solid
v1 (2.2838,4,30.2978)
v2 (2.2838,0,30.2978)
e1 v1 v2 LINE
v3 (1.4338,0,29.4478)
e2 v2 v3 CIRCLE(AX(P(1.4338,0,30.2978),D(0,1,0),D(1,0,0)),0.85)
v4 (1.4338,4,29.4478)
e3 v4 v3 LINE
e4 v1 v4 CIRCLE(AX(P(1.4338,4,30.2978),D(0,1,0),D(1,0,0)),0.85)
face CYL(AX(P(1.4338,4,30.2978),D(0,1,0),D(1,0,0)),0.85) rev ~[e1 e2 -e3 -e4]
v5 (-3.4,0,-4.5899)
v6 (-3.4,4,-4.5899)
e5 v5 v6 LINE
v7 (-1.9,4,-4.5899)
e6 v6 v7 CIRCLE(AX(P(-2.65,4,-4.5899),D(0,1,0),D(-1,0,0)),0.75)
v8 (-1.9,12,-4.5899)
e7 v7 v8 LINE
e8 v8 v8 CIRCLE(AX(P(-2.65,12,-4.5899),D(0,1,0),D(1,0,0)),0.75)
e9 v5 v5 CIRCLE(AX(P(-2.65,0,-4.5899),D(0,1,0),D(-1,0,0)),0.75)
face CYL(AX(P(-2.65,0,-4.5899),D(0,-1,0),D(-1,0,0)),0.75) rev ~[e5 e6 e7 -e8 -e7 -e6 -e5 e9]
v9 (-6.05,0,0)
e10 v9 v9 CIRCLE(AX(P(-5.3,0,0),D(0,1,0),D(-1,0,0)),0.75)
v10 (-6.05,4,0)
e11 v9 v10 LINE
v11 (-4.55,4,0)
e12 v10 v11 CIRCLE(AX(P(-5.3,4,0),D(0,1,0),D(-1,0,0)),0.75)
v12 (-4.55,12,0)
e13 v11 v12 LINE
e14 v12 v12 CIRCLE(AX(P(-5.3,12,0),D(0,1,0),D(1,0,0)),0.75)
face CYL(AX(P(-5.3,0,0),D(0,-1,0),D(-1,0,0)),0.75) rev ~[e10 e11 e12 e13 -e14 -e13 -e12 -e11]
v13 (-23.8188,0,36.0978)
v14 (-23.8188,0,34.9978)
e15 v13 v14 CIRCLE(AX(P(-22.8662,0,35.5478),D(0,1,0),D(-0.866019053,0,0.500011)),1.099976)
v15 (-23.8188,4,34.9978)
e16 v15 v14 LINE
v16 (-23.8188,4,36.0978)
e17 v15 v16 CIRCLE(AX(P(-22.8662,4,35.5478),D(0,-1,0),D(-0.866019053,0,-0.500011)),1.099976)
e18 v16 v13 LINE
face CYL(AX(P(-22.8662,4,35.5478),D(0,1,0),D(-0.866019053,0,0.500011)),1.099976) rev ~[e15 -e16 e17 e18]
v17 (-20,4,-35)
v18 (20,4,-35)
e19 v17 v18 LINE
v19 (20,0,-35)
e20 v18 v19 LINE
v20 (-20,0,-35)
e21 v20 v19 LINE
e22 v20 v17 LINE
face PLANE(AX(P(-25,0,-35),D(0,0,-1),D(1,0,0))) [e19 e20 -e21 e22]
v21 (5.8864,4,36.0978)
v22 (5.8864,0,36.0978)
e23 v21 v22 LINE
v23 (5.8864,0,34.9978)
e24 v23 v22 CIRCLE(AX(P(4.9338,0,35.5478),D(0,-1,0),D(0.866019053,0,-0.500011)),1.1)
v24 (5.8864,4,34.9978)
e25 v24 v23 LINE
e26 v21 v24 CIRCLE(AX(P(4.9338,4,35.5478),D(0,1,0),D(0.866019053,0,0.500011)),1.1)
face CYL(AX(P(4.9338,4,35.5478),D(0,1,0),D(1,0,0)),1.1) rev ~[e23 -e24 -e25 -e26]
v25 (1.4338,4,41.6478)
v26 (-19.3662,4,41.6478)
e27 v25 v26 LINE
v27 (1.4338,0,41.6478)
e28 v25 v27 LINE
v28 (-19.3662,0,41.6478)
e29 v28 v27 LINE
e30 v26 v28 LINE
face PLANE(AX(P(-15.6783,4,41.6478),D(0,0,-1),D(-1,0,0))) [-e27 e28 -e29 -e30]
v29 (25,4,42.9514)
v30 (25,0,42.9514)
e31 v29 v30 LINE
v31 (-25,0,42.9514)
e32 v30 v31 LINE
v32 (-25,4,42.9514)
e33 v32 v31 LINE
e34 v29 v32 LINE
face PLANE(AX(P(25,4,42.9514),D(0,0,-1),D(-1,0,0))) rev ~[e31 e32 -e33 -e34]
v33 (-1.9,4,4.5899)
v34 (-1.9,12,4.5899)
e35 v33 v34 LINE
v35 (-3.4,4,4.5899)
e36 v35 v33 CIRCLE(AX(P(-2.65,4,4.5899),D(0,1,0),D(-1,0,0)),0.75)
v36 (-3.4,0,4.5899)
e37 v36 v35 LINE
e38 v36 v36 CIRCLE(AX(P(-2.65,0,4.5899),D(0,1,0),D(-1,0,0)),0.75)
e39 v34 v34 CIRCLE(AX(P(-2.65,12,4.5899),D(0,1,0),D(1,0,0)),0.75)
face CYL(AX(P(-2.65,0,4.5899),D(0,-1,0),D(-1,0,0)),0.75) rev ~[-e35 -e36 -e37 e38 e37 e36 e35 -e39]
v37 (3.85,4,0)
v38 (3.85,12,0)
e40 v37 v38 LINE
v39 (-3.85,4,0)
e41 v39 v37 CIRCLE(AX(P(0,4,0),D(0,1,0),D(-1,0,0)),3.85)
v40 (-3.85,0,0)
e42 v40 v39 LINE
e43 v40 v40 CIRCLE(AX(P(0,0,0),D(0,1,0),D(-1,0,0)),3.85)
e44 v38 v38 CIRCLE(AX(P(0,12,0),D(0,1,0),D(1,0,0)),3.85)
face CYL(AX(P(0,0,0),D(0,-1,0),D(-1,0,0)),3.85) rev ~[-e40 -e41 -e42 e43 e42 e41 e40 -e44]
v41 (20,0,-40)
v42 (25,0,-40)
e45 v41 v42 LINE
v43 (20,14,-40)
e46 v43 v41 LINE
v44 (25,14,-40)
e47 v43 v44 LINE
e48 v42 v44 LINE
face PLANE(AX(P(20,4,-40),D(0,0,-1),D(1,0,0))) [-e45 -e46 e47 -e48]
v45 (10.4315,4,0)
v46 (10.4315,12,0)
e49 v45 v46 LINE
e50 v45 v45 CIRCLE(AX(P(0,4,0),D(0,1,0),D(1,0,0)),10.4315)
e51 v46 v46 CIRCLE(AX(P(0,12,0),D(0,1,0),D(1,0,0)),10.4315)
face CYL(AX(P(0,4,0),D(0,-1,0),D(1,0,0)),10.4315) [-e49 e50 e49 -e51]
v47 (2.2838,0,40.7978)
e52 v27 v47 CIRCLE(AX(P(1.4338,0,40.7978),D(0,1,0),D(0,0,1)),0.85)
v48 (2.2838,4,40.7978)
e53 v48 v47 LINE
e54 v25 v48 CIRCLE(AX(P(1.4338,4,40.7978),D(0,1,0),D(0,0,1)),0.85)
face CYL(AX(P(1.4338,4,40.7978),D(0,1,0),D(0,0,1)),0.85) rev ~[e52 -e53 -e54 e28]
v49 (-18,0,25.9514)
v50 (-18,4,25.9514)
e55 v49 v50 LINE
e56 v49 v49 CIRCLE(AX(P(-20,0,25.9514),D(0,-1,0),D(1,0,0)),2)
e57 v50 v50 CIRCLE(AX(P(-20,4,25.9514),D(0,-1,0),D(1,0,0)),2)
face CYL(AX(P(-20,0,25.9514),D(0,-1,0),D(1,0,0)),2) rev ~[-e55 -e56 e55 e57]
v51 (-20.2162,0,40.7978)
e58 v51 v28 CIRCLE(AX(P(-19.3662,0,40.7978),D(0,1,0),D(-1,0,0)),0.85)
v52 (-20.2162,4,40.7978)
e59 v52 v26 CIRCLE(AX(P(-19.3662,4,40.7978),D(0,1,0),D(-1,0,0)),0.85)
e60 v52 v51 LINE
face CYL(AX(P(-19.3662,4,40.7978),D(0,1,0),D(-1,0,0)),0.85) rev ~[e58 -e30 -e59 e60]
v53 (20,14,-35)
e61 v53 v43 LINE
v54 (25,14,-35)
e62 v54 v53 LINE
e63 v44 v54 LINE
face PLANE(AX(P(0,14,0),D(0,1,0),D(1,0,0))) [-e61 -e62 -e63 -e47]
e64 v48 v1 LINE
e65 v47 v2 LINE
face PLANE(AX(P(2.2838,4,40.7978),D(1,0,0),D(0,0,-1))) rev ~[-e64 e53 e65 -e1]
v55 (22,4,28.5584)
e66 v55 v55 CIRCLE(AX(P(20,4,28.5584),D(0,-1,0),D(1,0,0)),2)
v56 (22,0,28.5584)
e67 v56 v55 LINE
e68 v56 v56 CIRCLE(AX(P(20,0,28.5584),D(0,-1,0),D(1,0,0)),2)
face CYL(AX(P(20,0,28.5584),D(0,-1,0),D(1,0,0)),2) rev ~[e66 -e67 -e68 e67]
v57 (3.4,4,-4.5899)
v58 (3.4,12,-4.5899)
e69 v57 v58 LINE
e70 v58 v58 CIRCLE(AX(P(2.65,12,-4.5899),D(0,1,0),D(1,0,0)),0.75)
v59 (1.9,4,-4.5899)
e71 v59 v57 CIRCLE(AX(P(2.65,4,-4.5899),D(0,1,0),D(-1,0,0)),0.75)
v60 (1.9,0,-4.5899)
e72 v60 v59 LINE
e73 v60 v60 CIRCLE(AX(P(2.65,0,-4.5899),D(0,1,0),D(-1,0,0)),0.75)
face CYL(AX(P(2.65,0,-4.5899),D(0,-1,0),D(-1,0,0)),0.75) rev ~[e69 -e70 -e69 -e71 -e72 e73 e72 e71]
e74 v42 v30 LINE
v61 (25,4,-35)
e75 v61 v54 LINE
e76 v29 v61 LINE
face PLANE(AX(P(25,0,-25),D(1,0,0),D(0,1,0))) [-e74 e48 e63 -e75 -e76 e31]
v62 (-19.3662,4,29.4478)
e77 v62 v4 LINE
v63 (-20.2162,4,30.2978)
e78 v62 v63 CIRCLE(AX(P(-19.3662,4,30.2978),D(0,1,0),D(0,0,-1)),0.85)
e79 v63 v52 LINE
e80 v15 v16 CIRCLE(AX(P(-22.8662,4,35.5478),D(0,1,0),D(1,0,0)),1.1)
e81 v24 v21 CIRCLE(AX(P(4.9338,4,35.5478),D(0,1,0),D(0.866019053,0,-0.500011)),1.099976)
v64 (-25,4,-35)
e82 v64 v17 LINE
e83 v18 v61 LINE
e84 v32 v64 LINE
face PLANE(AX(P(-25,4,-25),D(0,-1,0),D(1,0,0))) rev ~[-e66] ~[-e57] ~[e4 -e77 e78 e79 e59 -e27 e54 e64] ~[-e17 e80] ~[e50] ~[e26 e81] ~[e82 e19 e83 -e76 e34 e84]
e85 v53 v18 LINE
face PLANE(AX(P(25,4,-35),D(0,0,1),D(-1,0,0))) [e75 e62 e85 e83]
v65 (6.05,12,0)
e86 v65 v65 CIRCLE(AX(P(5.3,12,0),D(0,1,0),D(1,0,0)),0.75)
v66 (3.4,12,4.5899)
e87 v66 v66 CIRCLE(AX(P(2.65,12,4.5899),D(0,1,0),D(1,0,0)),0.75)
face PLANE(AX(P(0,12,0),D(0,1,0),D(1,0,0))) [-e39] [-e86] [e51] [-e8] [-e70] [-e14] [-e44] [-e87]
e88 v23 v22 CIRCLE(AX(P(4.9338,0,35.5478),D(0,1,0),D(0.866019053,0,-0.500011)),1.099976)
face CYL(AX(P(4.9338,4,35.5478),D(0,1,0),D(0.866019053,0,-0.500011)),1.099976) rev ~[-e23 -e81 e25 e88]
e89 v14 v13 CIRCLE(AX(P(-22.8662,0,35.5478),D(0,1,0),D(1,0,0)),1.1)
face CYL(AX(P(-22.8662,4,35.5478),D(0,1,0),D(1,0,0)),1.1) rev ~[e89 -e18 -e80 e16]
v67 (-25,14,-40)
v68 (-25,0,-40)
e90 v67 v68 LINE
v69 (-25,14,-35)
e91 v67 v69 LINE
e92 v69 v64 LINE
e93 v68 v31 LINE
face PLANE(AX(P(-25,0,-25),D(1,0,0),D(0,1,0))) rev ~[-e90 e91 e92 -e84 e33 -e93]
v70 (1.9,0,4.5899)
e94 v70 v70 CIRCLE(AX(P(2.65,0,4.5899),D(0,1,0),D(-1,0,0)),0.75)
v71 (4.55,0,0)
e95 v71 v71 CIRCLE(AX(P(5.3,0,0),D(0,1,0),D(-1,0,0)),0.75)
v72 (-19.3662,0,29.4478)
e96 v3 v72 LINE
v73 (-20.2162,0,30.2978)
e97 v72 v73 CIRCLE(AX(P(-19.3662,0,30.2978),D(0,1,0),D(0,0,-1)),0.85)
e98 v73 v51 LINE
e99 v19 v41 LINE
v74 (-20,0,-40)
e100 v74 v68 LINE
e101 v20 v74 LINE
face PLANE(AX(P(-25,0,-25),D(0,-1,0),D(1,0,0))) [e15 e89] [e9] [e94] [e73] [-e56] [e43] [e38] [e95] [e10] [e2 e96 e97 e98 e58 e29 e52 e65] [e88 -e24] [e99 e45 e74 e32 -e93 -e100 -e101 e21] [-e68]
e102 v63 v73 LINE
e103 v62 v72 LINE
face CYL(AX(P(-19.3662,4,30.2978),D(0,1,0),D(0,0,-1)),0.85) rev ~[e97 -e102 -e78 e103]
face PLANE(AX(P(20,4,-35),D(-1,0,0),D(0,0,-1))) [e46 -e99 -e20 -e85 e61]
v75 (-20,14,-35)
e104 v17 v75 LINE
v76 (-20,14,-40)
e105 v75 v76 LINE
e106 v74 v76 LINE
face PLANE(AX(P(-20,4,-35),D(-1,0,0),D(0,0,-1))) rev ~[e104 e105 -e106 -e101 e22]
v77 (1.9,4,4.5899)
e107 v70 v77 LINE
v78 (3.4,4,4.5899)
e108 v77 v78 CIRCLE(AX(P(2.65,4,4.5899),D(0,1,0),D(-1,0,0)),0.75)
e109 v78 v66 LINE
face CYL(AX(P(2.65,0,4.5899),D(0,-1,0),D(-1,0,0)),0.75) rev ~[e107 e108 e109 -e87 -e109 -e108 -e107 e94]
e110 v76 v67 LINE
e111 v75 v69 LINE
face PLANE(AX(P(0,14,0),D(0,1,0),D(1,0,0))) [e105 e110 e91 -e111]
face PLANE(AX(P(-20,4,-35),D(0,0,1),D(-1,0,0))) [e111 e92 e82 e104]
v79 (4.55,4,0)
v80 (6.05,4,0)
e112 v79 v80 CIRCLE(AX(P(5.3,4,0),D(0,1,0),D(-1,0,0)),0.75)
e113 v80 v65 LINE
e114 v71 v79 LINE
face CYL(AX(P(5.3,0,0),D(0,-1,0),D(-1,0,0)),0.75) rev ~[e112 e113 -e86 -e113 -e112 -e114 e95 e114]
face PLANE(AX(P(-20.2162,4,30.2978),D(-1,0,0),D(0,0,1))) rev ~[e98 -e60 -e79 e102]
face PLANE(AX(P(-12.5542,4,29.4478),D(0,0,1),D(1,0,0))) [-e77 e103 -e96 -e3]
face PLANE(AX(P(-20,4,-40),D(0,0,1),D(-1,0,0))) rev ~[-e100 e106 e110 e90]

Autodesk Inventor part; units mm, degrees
ref_plane "YZ Plane" through (0, 0, 0) normal (1, 0, 0) x (0, 1, 0)
ref_plane "XZ Plane" through (0, 0, 0) normal (0, 1, 0) x (-1, 0, 0)
ref_plane "XY Plane" through (0, 0, 0) normal (0, 0, 1) x (1, 0, 0)
sketch "Эскиз1" plane through (0, 0, 0) normal (0, 1, 0) x (-1, 0, 0)
  circle A0 centre (-2.65, -4.5899) radius 0.75
  circle A1 centre (2.65, -4.5899) radius 0.75
  circle A2 centre (5.3, 0) radius 0.75
  circle A3 centre (2.65, 4.5899) radius 0.75
  circle A4 centre (-2.65, 4.5899) radius 0.75
  circle A5 centre (-5.3, 0) radius 0.75
  circle A6 centre (0, 0) radius 3.85
  arc A7 (-3.4059, 8.2225) -> (-3.1756, 6.1003) centre (3.6513, 7.9146) ccw
  arc A8 (-3.1756, 6.1003) -> (-3.6952, 5.8003) centre (0, 0) ccw
  arc A9 (-3.6952, 5.8003) -> (-5.418, 7.0608) centre (-8.6799, 0.7952) ccw
  arc A10 (-5.418, 7.0608) -> (-6.0128, 6.5618) centre (0, 0) ccw
  arc A11 (-6.0128, 6.5618) -> (-5.0705, 4.6463) centre (0.7241, 8.6861) ccw
  arc A12 (-5.0705, 4.6463) -> (-5.4562, 4.1867) centre (0, 0) ccw
  arc A13 (-5.4562, 4.1867) -> (-7.5062, 4.782) centre (-8.4284, -2.2214) ccw
  arc A14 (-7.5062, 4.782) -> (-7.8944, 4.1096) centre (0, 0) ccw
  arc A15 (-7.8944, 4.1096) -> (-6.3539, 2.6319) centre (-2.2904, 8.4099) ccw
  arc A16 (-6.3539, 2.6319) -> (-6.5591, 2.0681) centre (0, 0) ccw
  arc A17 (-6.5591, 2.0681) -> (-8.689, 1.9263) centre (-7.1604, -4.9702) ccw
  arc A18 (-8.689, 1.9263) -> (-8.8239, 1.1617) centre (0, 0) ccw
  arc A19 (-8.8239, 1.1617) -> (-6.8708, 0.3) centre (-5.0286, 7.1194) ccw
  arc A20 (-6.8708, 0.3) -> (-6.8708, -0.3) centre (0, 0) ccw
  arc A21 (-6.8708, -0.3) -> (-8.8239, -1.1617) centre (-5.0286, -7.1194) ccw
  arc A22 (-8.8239, -1.1617) -> (-8.689, -1.9263) centre (0, 0) ccw
  arc A23 (-8.689, -1.9263) -> (-6.5591, -2.0681) centre (-7.1604, 4.9702) ccw
  arc A24 (-6.5591, -2.0681) -> (-6.3539, -2.6319) centre (0, 0) ccw
  arc A25 (-6.3539, -2.6319) -> (-7.8944, -4.1096) centre (-2.2904, -8.4099) ccw
  arc A26 (-7.8944, -4.1096) -> (-7.5062, -4.782) centre (0, 0) ccw
  arc A27 (-7.5062, -4.782) -> (-5.4562, -4.1867) centre (-8.4284, 2.2214) ccw
  arc A28 (-5.4562, -4.1867) -> (-5.0705, -4.6463) centre (0, 0) ccw
  arc A29 (-5.0705, -4.6463) -> (-6.0128, -6.5618) centre (0.7241, -8.6861) ccw
  arc A30 (-6.0128, -6.5618) -> (-5.418, -7.0608) centre (0, 0) ccw
  arc A31 (-5.418, -7.0608) -> (-3.6952, -5.8003) centre (-8.6799, -0.7952) ccw
  arc A32 (-3.6952, -5.8003) -> (-3.1756, -6.1003) centre (0, 0) ccw
  arc A33 (-3.1756, -6.1003) -> (-3.4059, -8.2225) centre (3.6513, -7.9146) ccw
  arc A34 (-3.4059, -8.2225) -> (-2.6763, -8.4881) centre (0, 0) ccw
  arc A35 (-2.6763, -8.4881) -> (-1.4885, -6.7144) centre (-7.8845, -3.716) ccw
  arc A36 (-1.4885, -6.7144) -> (-0.8977, -6.8185) centre (0, 0) ccw
  arc A37 (-0.8977, -6.8185) -> (-0.3882, -8.8915) centre (6.138, -6.1885) ccw
  arc A38 (-0.3882, -8.8915) -> (0.3882, -8.8915) centre (0, 0) ccw
  arc A39 (0.3882, -8.8915) -> (0.8977, -6.8185) centre (-6.138, -6.1885) ccw
  arc A40 (0.8977, -6.8185) -> (1.4885, -6.7144) centre (0, 0) ccw
  arc A41 (1.4885, -6.7144) -> (2.6763, -8.4881) centre (7.8845, -3.716) ccw
  arc A42 (2.6763, -8.4881) -> (3.4059, -8.2225) centre (0, 0) ccw
  arc A43 (3.4059, -8.2225) -> (3.1756, -6.1003) centre (-3.6513, -7.9146) ccw
  arc A44 (3.1756, -6.1003) -> (3.6952, -5.8003) centre (0, 0) ccw
  arc A45 (3.6952, -5.8003) -> (5.418, -7.0608) centre (8.6799, -0.7952) ccw
  arc A46 (5.418, -7.0608) -> (6.0128, -6.5618) centre (0, 0) ccw
  arc A47 (6.0128, -6.5618) -> (5.0705, -4.6463) centre (-0.7241, -8.6861) ccw
  arc A48 (5.0705, -4.6463) -> (5.4562, -4.1867) centre (0, 0) ccw
  arc A49 (5.4562, -4.1867) -> (7.5062, -4.782) centre (8.4284, 2.2214) ccw
  arc A50 (7.5062, -4.782) -> (7.8944, -4.1096) centre (0, 0) ccw
  arc A51 (7.8944, -4.1096) -> (6.3539, -2.6319) centre (2.2904, -8.4099) ccw
  arc A52 (6.3539, -2.6319) -> (6.5591, -2.0681) centre (0, 0) ccw
  arc A53 (6.5591, -2.0681) -> (8.689, -1.9263) centre (7.1604, 4.9702) ccw
  arc A54 (8.689, -1.9263) -> (8.8239, -1.1617) centre (0, 0) ccw
  arc A55 (8.8239, -1.1617) -> (6.8708, -0.3) centre (5.0286, -7.1194) ccw
  arc A56 (6.8708, -0.3) -> (6.8708, 0.3) centre (0, 0) ccw
  arc A57 (6.8708, 0.3) -> (8.8239, 1.1617) centre (5.0286, 7.1194) ccw
  arc A58 (8.8239, 1.1617) -> (8.689, 1.9263) centre (0, 0) ccw
  arc A59 (8.689, 1.9263) -> (6.5591, 2.0681) centre (7.1604, -4.9702) ccw
  arc A60 (6.5591, 2.0681) -> (6.3539, 2.6319) centre (0, 0) ccw
  arc A61 (6.3539, 2.6319) -> (7.8944, 4.1096) centre (2.2904, 8.4099) ccw
  arc A62 (7.8944, 4.1096) -> (7.5062, 4.782) centre (0, 0) ccw
  arc A63 (7.5062, 4.782) -> (5.4562, 4.1867) centre (8.4284, -2.2214) ccw
  arc A64 (5.4562, 4.1867) -> (5.0705, 4.6463) centre (0, 0) ccw
  arc A65 (5.0705, 4.6463) -> (6.0128, 6.5618) centre (-0.7241, 8.6861) ccw
  arc A66 (6.0128, 6.5618) -> (5.418, 7.0608) centre (0, 0) ccw
  arc A67 (5.418, 7.0608) -> (3.6952, 5.8003) centre (8.6799, 0.7952) ccw
  arc A68 (3.6952, 5.8003) -> (3.1756, 6.1003) centre (0, 0) ccw
  arc A69 (3.1756, 6.1003) -> (3.4059, 8.2225) centre (-3.6513, 7.9146) ccw
  arc A70 (3.4059, 8.2225) -> (2.6763, 8.4881) centre (0, 0) ccw
  arc A71 (2.6763, 8.4881) -> (1.4885, 6.7144) centre (7.8845, 3.716) ccw
  arc A72 (1.4885, 6.7144) -> (0.8977, 6.8185) centre (0, 0) ccw
  arc A73 (0.8977, 6.8185) -> (0.3882, 8.8915) centre (-6.138, 6.1885) ccw
  arc A74 (0.3882, 8.8915) -> (-0.3882, 8.8915) centre (0, 0) ccw
  arc A75 (-0.3882, 8.8915) -> (-0.8977, 6.8185) centre (6.138, 6.1885) ccw
  arc A76 (-0.8977, 6.8185) -> (-1.4885, 6.7144) centre (0, 0) ccw
  arc A77 (-1.4885, 6.7144) -> (-2.6763, 8.4881) centre (-7.8845, 3.716) ccw
  arc A78 (-2.6763, 8.4881) -> (-3.4059, 8.2225) centre (0, 0) ccw
  line L0 (-25, 25) -> (25, 25)
  line L1 (25, 25) -> (25, -25)
  line L2 (25, -25) -> (-25, -25)
  line L3 (-25, -25) -> (-25, 25)
  line L4 (-25, 25) -> (25, -25) construction
  line L5 (25, 25) -> (-25, -25) construction
  dimension "d4" = 50
  dimension "d5" = 50
extrude "Выдавливание1" add sketch "Эскиз1" along normal blind 4 contours A78 A77 A76 A75 A74 A73 A72 A71 A70 A69 A68 A67 A66 A65 A64 A63 A62 A61 A60 A59 A58 A57 A56 A55 A54 A53 A52 A51 A50 A49 A48 A47 A46 A45 A44 A43 A42 A41 A40 A39 A38 A37 A36 A35 A34 A33 A32 A31 A30 A29 A28 A27 A26 A25 A24 A23 A22 A21 A20 A19 A18 A17 A16 A15 A14 A13 A12 A11 A10 A9 A8 A7 | L0 L1 L2 L3
sketch "Эскиз2" plane through (0, 4, 0) normal (0, 1, 0) x (1, 0, 0)
  line L0 (-8.6363, -32.6478) -> (-8.5162, -32.6478)
  arc A0 (-8.5162, -38.4478) -> (-8.5162, -32.6478) centre (-8.5162, -35.5478) ccw
  line L1 (-8.5162, -38.4478) -> (-8.6363, -38.4478)
  arc A1 (-12.5542, -41.5478) -> (-8.6363, -38.4478) centre (-14.1162, -35.5478) ccw
  line L2 (-12.5542, -41.5478) -> (1.4338, -41.5478)
  arc A2 (1.4338, -41.5478) -> (2.1838, -40.7978) centre (1.4338, -40.7978) ccw
  line L3 (2.1838, -40.7978) -> (2.1838, -30.2978)
  arc A3 (2.1838, -30.2978) -> (1.4338, -29.5478) centre (1.4338, -30.2978) ccw
  line L4 (1.4338, -29.5478) -> (-12.5542, -29.5478)
  arc A4 (-8.6363, -32.6478) -> (-12.5542, -29.5478) centre (-14.1162, -35.5478) ccw
  line L5 (-4.2162, -40.6478) -> (0.7838, -40.6478)
  arc A5 (-4.7162, -40.1478) -> (-4.2162, -40.6478) centre (-4.2162, -40.1478) ccw
  line L6 (-4.7162, -30.9478) -> (-4.7162, -40.1478)
  arc A6 (-4.2162, -30.4478) -> (-4.7162, -30.9478) centre (-4.2162, -30.9478) ccw
  line L7 (0.7838, -30.4478) -> (-4.2162, -30.4478)
  arc A7 (1.2838, -30.9478) -> (0.7838, -30.4478) centre (0.7838, -30.9478) ccw
  line L8 (1.2838, -40.1478) -> (1.2838, -30.9478)
  arc A8 (0.7838, -40.6478) -> (1.2838, -40.1478) centre (0.7838, -40.1478) ccw
  arc A9 (5.8864, -34.9978) -> (5.8864, -36.0978) centre (4.9338, -35.5478) ccw
  line L9 (7.0838, -34.9978) -> (5.8864, -34.9978)
  line L10 (7.0838, -34.9978) -> (7.0838, -30.2978)
  arc A10 (7.0838, -30.2978) -> (6.2338, -29.4478) centre (6.2338, -30.2978) ccw
  line L11 (6.2338, -29.4478) -> (1.4338, -29.4478)
  arc A11 (2.2838, -30.2978) -> (1.4338, -29.4478) centre (1.4338, -30.2978) ccw
  line L12 (2.2838, -40.7978) -> (2.2838, -30.2978)
  arc A12 (1.4338, -41.6478) -> (2.2838, -40.7978) centre (1.4338, -40.7978) ccw
  line L13 (1.4338, -41.6478) -> (6.2338, -41.6478)
  arc A13 (6.2338, -41.6478) -> (7.0838, -40.7978) centre (6.2338, -40.7978) ccw
  line L14 (7.0838, -40.7978) -> (7.0838, -36.0978)
  line L15 (5.8864, -36.0978) -> (7.0838, -36.0978)
  line L16 (-25.0162, -30.2978) -> (-25.0162, -34.9978)
  line L17 (-23.8188, -34.9978) -> (-25.0162, -34.9978)
  arc A14 (-23.8188, -36.0978) -> (-23.8188, -34.9978) centre (-22.8662, -35.5478) ccw
  line L18 (-25.0162, -36.0978) -> (-23.8188, -36.0978)
  line L19 (-25.0162, -36.0978) -> (-25.0162, -40.7978)
  arc A15 (-25.0162, -40.7978) -> (-24.1662, -41.6478) centre (-24.1662, -40.7978) ccw
  line L20 (-24.1662, -41.6478) -> (-19.3662, -41.6478)
  arc A16 (-20.2162, -40.7978) -> (-19.3662, -41.6478) centre (-19.3662, -40.7978) ccw
  line L21 (-20.2162, -30.2978) -> (-20.2162, -40.7978)
  arc A17 (-19.3662, -29.4478) -> (-20.2162, -30.2978) centre (-19.3662, -30.2978) ccw
  line L22 (-19.3662, -29.4478) -> (-24.1662, -29.4478)
  arc A18 (-24.1662, -29.4478) -> (-25.0162, -30.2978) centre (-24.1662, -30.2978) ccw
  line L23 (-19.3662, -29.4478) -> (-15.6783, -29.4478)
  line L24 (-12.5542, -29.4478) -> (-14.1162, -29.4478)
  line L25 (-14.1162, -29.4478) -> (-15.6783, -29.4478)
  line L26 (-12.5542, -29.4478) -> (1.4338, -29.4478)
  line L27 (1.4338, -41.6478) -> (-12.5542, -41.6478)
  line L28 (-15.6783, -41.6478) -> (-19.3662, -41.6478)
  line L29 (-15.6783, -41.6478) -> (-14.1162, -41.6478)
  line L30 (-14.1162, -41.6478) -> (-12.5542, -41.6478)
  arc A19 (-15.6783, -29.5478) -> (-20.1162, -33.9857) centre (-14.1162, -35.5478) ccw
  line L31 (-15.6783, -29.5478) -> (-19.3662, -29.5478)
  arc A20 (-19.3662, -29.5478) -> (-20.1162, -30.2978) centre (-19.3662, -30.2978) ccw
  line L32 (-20.1162, -30.2978) -> (-20.1162, -33.9857)
  line L33 (-19.3662, -41.5478) -> (-15.6783, -41.5478)
  arc A21 (-20.1162, -37.1098) -> (-15.6783, -41.5478) centre (-14.1162, -35.5478) ccw
  line L34 (-20.1162, -37.1098) -> (-20.1162, -40.7978)
  arc A22 (-20.1162, -40.7978) -> (-19.3662, -41.5478) centre (-19.3662, -40.7978) ccw
  circle A23 centre (4.9338, -35.5478) radius 1.1
  line L35 (5.8864, -34.9978) -> (7.0838, -34.9978)
  line L36 (7.0838, -36.0978) -> (7.0838, -34.9978)
  circle A24 centre (-22.8662, -35.5478) radius 1.1
  line L37 (-25.0162, -34.9978) -> (-23.8188, -34.9978)
  line L38 (-25.0162, -36.0978) -> (-25.0162, -34.9978)
  circle A25 centre (-14.1162, -35.5478) radius 0.8
  line L39 (-25, -25) -> (-25, 25) projected
  line L40 (25, -42.9514) -> (-25, -42.9514)
  line L41 (-25, -42.9514) -> (-25, -25)
  line L42 (-25, -25) -> (25, -25)
  line L43 (25, -25) -> (25, -42.9514)
  line L44 (25, -25) -> (-25, -25) projected
  point P0 (0, 0)
  point P1 (-8.9662, -35.5478)
  dimension "d27" = 0
extrude "Выдавливание2" add sketch "Эскиз2" against normal blind 4 contours A9 L15 L14 A13 L13 A12 L12 A11 L11 A10 L10 L9 | L9 L36 L15 A23 | L10 A10 L11 L26 L24 L25 L23 L22 A18 L41 L42 L43 L40 A15 L20 L28 L29 L30 L27 L13 A13 L14 L36 | A17 L21 A16 L20 A15 L41 L18 A14 L17 A18 L22 | L17 A24 L18 L41
sketch "Эскиз3" plane through (0, 4, 0) normal (0, 1, 0) x (1, 0, 0)
  circle A0 centre (-2.65, -4.5899) radius 0.75
  circle A1 centre (2.65, -4.5899) radius 0.75
  circle A2 centre (5.3, 0) radius 0.75
  circle A3 centre (2.65, 4.5899) radius 0.75
  circle A4 centre (-2.65, 4.5899) radius 0.75
  circle A5 centre (-5.3, 0) radius 0.75
  circle A6 centre (0, 0) radius 3.85
  arc A7 (-3.4059, 8.2225) -> (-3.1756, 6.1003) centre (3.6513, 7.9146) ccw
  arc A8 (-3.1756, 6.1003) -> (-3.6952, 5.8003) centre (0, 0) ccw
  arc A9 (-3.6952, 5.8003) -> (-5.418, 7.0608) centre (-8.6799, 0.7952) ccw
  arc A10 (-5.418, 7.0608) -> (-6.0128, 6.5618) centre (0, 0) ccw
  arc A11 (-6.0128, 6.5618) -> (-5.0705, 4.6463) centre (0.7241, 8.6861) ccw
  arc A12 (-5.0705, 4.6463) -> (-5.4562, 4.1867) centre (0, 0) ccw
  arc A13 (-5.4562, 4.1867) -> (-7.5062, 4.782) centre (-8.4284, -2.2214) ccw
  arc A14 (-7.5062, 4.782) -> (-7.8944, 4.1096) centre (0, 0) ccw
  arc A15 (-7.8944, 4.1096) -> (-6.3539, 2.6319) centre (-2.2904, 8.4099) ccw
  arc A16 (-6.3539, 2.6319) -> (-6.5591, 2.0681) centre (0, 0) ccw
  arc A17 (-6.5591, 2.0681) -> (-8.689, 1.9263) centre (-7.1604, -4.9702) ccw
  arc A18 (-8.689, 1.9263) -> (-8.8239, 1.1617) centre (0, 0) ccw
  arc A19 (-8.8239, 1.1617) -> (-6.8708, 0.3) centre (-5.0286, 7.1194) ccw
  arc A20 (-6.8708, 0.3) -> (-6.8708, -0.3) centre (0, 0) ccw
  arc A21 (-6.8708, -0.3) -> (-8.8239, -1.1617) centre (-5.0286, -7.1194) ccw
  arc A22 (-8.8239, -1.1617) -> (-8.689, -1.9263) centre (0, 0) ccw
  arc A23 (-8.689, -1.9263) -> (-6.5591, -2.0681) centre (-7.1604, 4.9702) ccw
  arc A24 (-6.5591, -2.0681) -> (-6.3539, -2.6319) centre (0, 0) ccw
  arc A25 (-6.3539, -2.6319) -> (-7.8944, -4.1096) centre (-2.2904, -8.4099) ccw
  arc A26 (-7.8944, -4.1096) -> (-7.5062, -4.782) centre (0, 0) ccw
  arc A27 (-7.5062, -4.782) -> (-5.4562, -4.1867) centre (-8.4284, 2.2214) ccw
  arc A28 (-5.4562, -4.1867) -> (-5.0705, -4.6463) centre (0, 0) ccw
  arc A29 (-5.0705, -4.6463) -> (-6.0128, -6.5618) centre (0.7241, -8.6861) ccw
  arc A30 (-6.0128, -6.5618) -> (-5.418, -7.0608) centre (0, 0) ccw
  arc A31 (-5.418, -7.0608) -> (-3.6952, -5.8003) centre (-8.6799, -0.7952) ccw
  arc A32 (-3.6952, -5.8003) -> (-3.1756, -6.1003) centre (0, 0) ccw
  arc A33 (-3.1756, -6.1003) -> (-3.4059, -8.2225) centre (3.6513, -7.9146) ccw
  arc A34 (-3.4059, -8.2225) -> (-2.6763, -8.4881) centre (0, 0) ccw
  arc A35 (-2.6763, -8.4881) -> (-1.4885, -6.7144) centre (-7.8845, -3.716) ccw
  arc A36 (-1.4885, -6.7144) -> (-0.8977, -6.8185) centre (0, 0) ccw
  arc A37 (-0.8977, -6.8185) -> (-0.3882, -8.8915) centre (6.138, -6.1885) ccw
  arc A38 (-0.3882, -8.8915) -> (0.3882, -8.8915) centre (0, 0) ccw
  arc A39 (0.3882, -8.8915) -> (0.8977, -6.8185) centre (-6.138, -6.1885) ccw
  arc A40 (0.8977, -6.8185) -> (1.4885, -6.7144) centre (0, 0) ccw
  arc A41 (1.4885, -6.7144) -> (2.6763, -8.4881) centre (7.8845, -3.716) ccw
  arc A42 (2.6763, -8.4881) -> (3.4059, -8.2225) centre (0, 0) ccw
  arc A43 (3.4059, -8.2225) -> (3.1756, -6.1003) centre (-3.6513, -7.9146) ccw
  arc A44 (3.1756, -6.1003) -> (3.6952, -5.8003) centre (0, 0) ccw
  arc A45 (3.6952, -5.8003) -> (5.418, -7.0608) centre (8.6799, -0.7952) ccw
  arc A46 (5.418, -7.0608) -> (6.0128, -6.5618) centre (0, 0) ccw
  arc A47 (6.0128, -6.5618) -> (5.0705, -4.6463) centre (-0.7241, -8.6861) ccw
  arc A48 (5.0705, -4.6463) -> (5.4562, -4.1867) centre (0, 0) ccw
  arc A49 (5.4562, -4.1867) -> (7.5062, -4.782) centre (8.4284, 2.2214) ccw
  arc A50 (7.5062, -4.782) -> (7.8944, -4.1096) centre (0, 0) ccw
  arc A51 (7.8944, -4.1096) -> (6.3539, -2.6319) centre (2.2904, -8.4099) ccw
  arc A52 (6.3539, -2.6319) -> (6.5591, -2.0681) centre (0, 0) ccw
  arc A53 (6.5591, -2.0681) -> (8.689, -1.9263) centre (7.1604, 4.9702) ccw
  arc A54 (8.689, -1.9263) -> (8.8239, -1.1617) centre (0, 0) ccw
  arc A55 (8.8239, -1.1617) -> (6.8708, -0.3) centre (5.0286, -7.1194) ccw
  arc A56 (6.8708, -0.3) -> (6.8708, 0.3) centre (0, 0) ccw
  arc A57 (6.8708, 0.3) -> (8.8239, 1.1617) centre (5.0286, 7.1194) ccw
  arc A58 (8.8239, 1.1617) -> (8.689, 1.9263) centre (0, 0) ccw
  arc A59 (8.689, 1.9263) -> (6.5591, 2.0681) centre (7.1604, -4.9702) ccw
  arc A60 (6.5591, 2.0681) -> (6.3539, 2.6319) centre (0, 0) ccw
  arc A61 (6.3539, 2.6319) -> (7.8944, 4.1096) centre (2.2904, 8.4099) ccw
  arc A62 (7.8944, 4.1096) -> (7.5062, 4.782) centre (0, 0) ccw
  arc A63 (7.5062, 4.782) -> (5.4562, 4.1867) centre (8.4284, -2.2214) ccw
  arc A64 (5.4562, 4.1867) -> (5.0705, 4.6463) centre (0, 0) ccw
  arc A65 (5.0705, 4.6463) -> (6.0128, 6.5618) centre (-0.7241, 8.6861) ccw
  arc A66 (6.0128, 6.5618) -> (5.418, 7.0608) centre (0, 0) ccw
  arc A67 (5.418, 7.0608) -> (3.6952, 5.8003) centre (8.6799, 0.7952) ccw
  arc A68 (3.6952, 5.8003) -> (3.1756, 6.1003) centre (0, 0) ccw
  arc A69 (3.1756, 6.1003) -> (3.4059, 8.2225) centre (-3.6513, 7.9146) ccw
  arc A70 (3.4059, 8.2225) -> (2.6763, 8.4881) centre (0, 0) ccw
  arc A71 (2.6763, 8.4881) -> (1.4885, 6.7144) centre (7.8845, 3.716) ccw
  arc A72 (1.4885, 6.7144) -> (0.8977, 6.8185) centre (0, 0) ccw
  arc A73 (0.8977, 6.8185) -> (0.3882, 8.8915) centre (-6.138, 6.1885) ccw
  arc A74 (0.3882, 8.8915) -> (-0.3882, 8.8915) centre (0, 0) ccw
  arc A75 (-0.3882, 8.8915) -> (-0.8977, 6.8185) centre (6.138, 6.1885) ccw
  arc A76 (-0.8977, 6.8185) -> (-1.4885, 6.7144) centre (0, 0) ccw
  arc A77 (-1.4885, 6.7144) -> (-2.6763, 8.4881) centre (-7.8845, 3.716) ccw
  arc A78 (-2.6763, 8.4881) -> (-3.4059, 8.2225) centre (0, 0) ccw
  line L0 (-25, 25) -> (25, 25)
  line L1 (25, 25) -> (25, -25)
  circle A79 centre (0, 0) radius 10.4315
  dimension "d9" = 50
extrude "Выдавливание3" add sketch "Эскиз3" along normal blind 8 contours A78 A77 A76 A75 A74 A73 A72 A71 A70 A69 A68 A67 A66 A65 A64 A63 A62 A61 A60 A59 A58 A57 A56 A55 A54 A53 A52 A51 A50 A49 A48 A47 A46 A45 A44 A43 A42 A41 A40 A39 A38 A37 A36 A35 A34 A33 A32 A31 A30 A29 A28 A27 A26 A25 A24 A23 A22 A21 A20 A19 A18 A17 A16 A15 A14 A13 A12 A11 A10 A9 A8 A7 | A79
sketch "Эскиз5" plane through (0, 0, 0) normal (0, -1, 0) x (1, 0, 0)
  circle A0 centre (20, 28.5584) radius 2 projected
  circle A1 centre (-20, 25.9514) radius 2
  line L0 (25, 42.9514) -> (-25, 42.9514) projected
  point P0 (0, 0)
  dimension "d15" = 17
extrude "Выдавливание4" cut sketch "Эскиз5" against normal blind 12.25
move faces "Перенос1" translate (0, 0, -10) faces at (-8.3333, 1.3333, -25)
sketch "Эскиз6" plane through (0, 4, 0) normal (0, 1, 0) x (1, 0, 0)
  line L0 (25, 35) -> (-25, 35) projected
  line L1 (-25, 35) -> (-20, 35)
  line L2 (-20, 35) -> (-20, 40)
  line L3 (-20, 40) -> (-25, 40)
  line L4 (-25, 40) -> (-25, 35)
  line L5 (25, 35) -> (20, 35)
  line L6 (20, 35) -> (20, 40)
  line L7 (20, 40) -> (25, 40)
  line L8 (25, 40) -> (25, 35)
  point P0 (0, 0)
  dimension "d19" = 5
  dimension "d20" = 5
  dimension "d21" = 5
  dimension "d22" = 5
extrude "Выдавливание5" add sketch "Эскиз6" along normal blind 10 and the other way blind 4
properties part number "000.801 - Опора" material "Пластик АБС"
